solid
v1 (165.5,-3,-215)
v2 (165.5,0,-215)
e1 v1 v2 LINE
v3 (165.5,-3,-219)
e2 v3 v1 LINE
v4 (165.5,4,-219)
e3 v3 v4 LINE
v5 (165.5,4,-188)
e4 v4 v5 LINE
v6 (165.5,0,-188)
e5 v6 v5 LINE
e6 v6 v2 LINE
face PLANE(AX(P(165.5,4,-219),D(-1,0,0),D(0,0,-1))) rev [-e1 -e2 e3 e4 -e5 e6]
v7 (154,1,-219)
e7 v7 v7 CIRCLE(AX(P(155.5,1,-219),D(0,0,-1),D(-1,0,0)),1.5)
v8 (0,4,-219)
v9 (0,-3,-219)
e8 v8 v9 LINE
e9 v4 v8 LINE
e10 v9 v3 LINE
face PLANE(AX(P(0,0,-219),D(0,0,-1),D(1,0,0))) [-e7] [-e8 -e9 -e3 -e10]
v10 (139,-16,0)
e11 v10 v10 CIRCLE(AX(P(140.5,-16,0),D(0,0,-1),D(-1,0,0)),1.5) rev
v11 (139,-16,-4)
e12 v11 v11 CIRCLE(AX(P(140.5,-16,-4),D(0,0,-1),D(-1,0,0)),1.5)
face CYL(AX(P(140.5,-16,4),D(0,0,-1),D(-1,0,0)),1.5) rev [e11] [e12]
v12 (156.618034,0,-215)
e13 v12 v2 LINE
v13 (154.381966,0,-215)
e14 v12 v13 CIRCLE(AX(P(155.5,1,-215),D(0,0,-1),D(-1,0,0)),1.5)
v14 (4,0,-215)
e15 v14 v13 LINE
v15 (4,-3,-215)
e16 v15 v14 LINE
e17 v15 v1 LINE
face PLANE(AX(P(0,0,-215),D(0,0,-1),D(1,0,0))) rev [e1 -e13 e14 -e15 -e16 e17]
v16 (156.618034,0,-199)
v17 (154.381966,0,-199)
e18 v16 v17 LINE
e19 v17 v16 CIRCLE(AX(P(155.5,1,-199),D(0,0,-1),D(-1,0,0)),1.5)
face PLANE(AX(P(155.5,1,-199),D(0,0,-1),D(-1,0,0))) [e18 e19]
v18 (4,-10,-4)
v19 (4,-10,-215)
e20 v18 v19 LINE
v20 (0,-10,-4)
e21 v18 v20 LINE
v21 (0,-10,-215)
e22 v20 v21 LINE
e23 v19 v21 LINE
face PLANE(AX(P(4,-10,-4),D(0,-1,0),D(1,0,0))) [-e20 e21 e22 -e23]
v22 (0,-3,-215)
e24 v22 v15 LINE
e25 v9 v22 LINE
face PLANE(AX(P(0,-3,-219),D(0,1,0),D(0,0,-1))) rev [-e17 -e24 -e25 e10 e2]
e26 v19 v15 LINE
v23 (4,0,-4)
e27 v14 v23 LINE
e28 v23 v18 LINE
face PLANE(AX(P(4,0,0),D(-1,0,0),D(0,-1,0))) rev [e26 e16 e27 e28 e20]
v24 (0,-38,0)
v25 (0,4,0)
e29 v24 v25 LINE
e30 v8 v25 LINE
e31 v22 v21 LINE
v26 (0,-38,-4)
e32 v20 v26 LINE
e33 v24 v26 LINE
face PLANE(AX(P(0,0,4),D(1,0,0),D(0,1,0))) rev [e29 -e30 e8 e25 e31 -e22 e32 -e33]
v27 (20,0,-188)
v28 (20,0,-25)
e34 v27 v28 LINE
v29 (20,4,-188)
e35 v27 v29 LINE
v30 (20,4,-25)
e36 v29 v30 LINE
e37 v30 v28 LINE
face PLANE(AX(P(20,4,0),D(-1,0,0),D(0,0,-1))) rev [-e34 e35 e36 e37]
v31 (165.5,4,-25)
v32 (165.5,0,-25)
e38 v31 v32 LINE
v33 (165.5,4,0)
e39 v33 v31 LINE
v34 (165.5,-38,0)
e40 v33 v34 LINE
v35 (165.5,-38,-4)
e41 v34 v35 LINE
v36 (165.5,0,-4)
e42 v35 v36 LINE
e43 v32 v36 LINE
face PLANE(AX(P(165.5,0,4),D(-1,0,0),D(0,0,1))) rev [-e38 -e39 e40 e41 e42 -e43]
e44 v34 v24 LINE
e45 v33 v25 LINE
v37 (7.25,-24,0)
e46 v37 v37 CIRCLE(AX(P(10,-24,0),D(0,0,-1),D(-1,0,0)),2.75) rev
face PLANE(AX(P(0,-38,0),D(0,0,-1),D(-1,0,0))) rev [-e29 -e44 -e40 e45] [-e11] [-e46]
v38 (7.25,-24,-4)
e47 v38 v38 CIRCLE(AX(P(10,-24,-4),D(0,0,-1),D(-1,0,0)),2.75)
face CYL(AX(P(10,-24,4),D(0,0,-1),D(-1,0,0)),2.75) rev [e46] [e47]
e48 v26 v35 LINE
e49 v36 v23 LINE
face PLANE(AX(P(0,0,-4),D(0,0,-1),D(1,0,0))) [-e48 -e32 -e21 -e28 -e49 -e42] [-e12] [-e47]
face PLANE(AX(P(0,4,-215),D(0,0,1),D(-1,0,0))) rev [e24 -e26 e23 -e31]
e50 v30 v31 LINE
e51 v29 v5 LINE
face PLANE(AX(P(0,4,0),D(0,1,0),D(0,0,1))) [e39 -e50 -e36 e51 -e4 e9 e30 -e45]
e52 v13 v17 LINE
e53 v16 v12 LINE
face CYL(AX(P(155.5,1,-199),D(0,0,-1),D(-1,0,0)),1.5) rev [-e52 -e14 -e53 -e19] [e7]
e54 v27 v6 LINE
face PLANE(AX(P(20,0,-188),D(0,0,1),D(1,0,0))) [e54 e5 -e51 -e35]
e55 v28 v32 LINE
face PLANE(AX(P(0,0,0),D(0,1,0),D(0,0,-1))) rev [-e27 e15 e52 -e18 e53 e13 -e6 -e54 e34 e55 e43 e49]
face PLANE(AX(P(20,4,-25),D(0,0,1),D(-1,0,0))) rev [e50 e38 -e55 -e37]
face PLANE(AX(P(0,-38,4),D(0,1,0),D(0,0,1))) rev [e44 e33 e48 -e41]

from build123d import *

# Parameters (mm, degrees)
SKETCH_1_W           = 165.5
SKETCH_1_H           = 38
EXTRUDE_1_DEPTH      = 4
SKETCH_2_W           = 20
SKETCH_2_H           = 215
EXTRUDE_2_DEPTH      = 4
SKETCH_3_W           = 211
SKETCH_3_H           = 10
EXTRUDE_3_DEPTH      = 4
SKETCH_4_W           = 145.5
SKETCH_4_H           = 25
EXTRUDE_4_DEPTH      = 4
SKETCH_5_R           = 1.5
CUT_EXTRUDE_1_DEPTH  = 4
SKETCH_6_W           = 165.5
SKETCH_6_H           = 7
EXTRUDE_5_DEPTH      = 4
SKETCH_7_W           = 145.5
SKETCH_7_H           = 27
EXTRUDE_6_DEPTH      = 4
SKETCH_8_R           = 2.75
CUT_EXTRUDE_2_DEPTH  = 4
MIRROR_START         = -4
MIRROR_3_OUTLINE_W   = 165.5
MIRROR_3_OUTLINE_H   = 42
MIRROR_3_OUTLINE_R   = 1.5
MIRROR_3_OUTLINE_R_2 = 2.75
MIRROR_3_DEPTH       = 4
MIRROR_START_2       = -215
MIRROR_3_2_DEPTH     = 211
MIRROR_START_3       = -25
MIRROR_3_3_OUTLINE_W = 145.5
MIRROR_3_3_OUTLINE_H = 4
MIRROR_3_3_DEPTH     = 21
MIRROR_START_4       = -219
MIRROR_3_4_OUTLINE_W = 165.5
MIRROR_3_4_OUTLINE_H = 7
MIRROR_3_4_DEPTH     = 4
SKETCH_9_W           = 186.740400525
SKETCH_9_H           = 237.71944978
CUT_EXTRUDE_3_DEPTH  = 278.696326947
SKETCH_10_W          = 145.5
SKETCH_10_H          = 27
EXTRUDE_7_DEPTH      = 4
SKETCH_11_R          = 1.5
CUT_EXTRUDE_4_DEPTH  = 20


# Read off the part's stored shape, not the designer's step: 镜向3
with BuildPart() as part:
    # 草图1 → 凸台-拉伸1 (new body)
    with BuildSketch(Plane.XY):
        with Locations((82.75, -19)):
            Rectangle(SKETCH_1_W, SKETCH_1_H)
    extrude(amount=EXTRUDE_1_DEPTH)

    # 草图2 → 凸台-拉伸2 (add)
    with BuildSketch(Plane(origin=(0, 0, 0), x_dir=(1, 0, 0), z_dir=(0, 1, 0))):
        with Locations((10, -107.5)):
            Rectangle(SKETCH_2_W, SKETCH_2_H)
    extrude(amount=EXTRUDE_2_DEPTH)

    # 草图3 → 凸台-拉伸3 (add)
    with BuildSketch(Plane.ZY):
        with Locations((109.5, -5)):
            Rectangle(SKETCH_3_W, SKETCH_3_H)
    extrude(amount=-EXTRUDE_3_DEPTH)

    # 草图4 → 凸台-拉伸4 (add)
    with BuildSketch(Plane(origin=(0, 0, 0), x_dir=(1, 0, 0), z_dir=(0, 1, 0))):
        with Locations((92.75, -12.5)):
            Rectangle(SKETCH_4_W, SKETCH_4_H)
    extrude(amount=EXTRUDE_4_DEPTH)

    # 草图5 → 切除-拉伸1 (cut)
    with BuildSketch(Plane(origin=(0, 0, 0), x_dir=(-1, 0, 0), z_dir=(0, 0, -1))):
        with Locations((-140.5, -16)):
            Circle(SKETCH_5_R)
    extrude(amount=-CUT_EXTRUDE_1_DEPTH, mode=Mode.SUBTRACT)

    # 草图6 → 凸台-拉伸5 (add)
    with BuildSketch(Plane.XY.offset(215)):
        with Locations((82.75, 0.5)):
            Rectangle(SKETCH_6_W, SKETCH_6_H)
    extrude(amount=EXTRUDE_5_DEPTH)

    # 草图8 → 切除-拉伸2 (cut)
    with BuildSketch(Plane(origin=(0, 0, 0), x_dir=(-1, 0, 0), z_dir=(0, 0, -1))):
        with Locations((-10, -24)):
            Circle(SKETCH_8_R)
    extrude(amount=-CUT_EXTRUDE_2_DEPTH, mode=Mode.SUBTRACT)

    # 镜向3 outline → 镜向3 (add)
    with BuildSketch(Plane.XY.offset(MIRROR_START)):
        with Locations((82.75, -17)):
            Rectangle(MIRROR_3_OUTLINE_W, MIRROR_3_OUTLINE_H)
        with Locations((140.5, -16)):
            Circle(MIRROR_3_OUTLINE_R, mode=Mode.SUBTRACT)
        with Locations((10, -24)):
            Circle(MIRROR_3_OUTLINE_R_2, mode=Mode.SUBTRACT)
    extrude(amount=MIRROR_3_DEPTH)

    # Mirror 3 2 outline → Mirror 3 2 (add)
    with BuildSketch(Plane.XY.offset(MIRROR_START_2)):
        Polygon((20, 0), (20, 4), (0, 4), (0, -10), (4, -10), (4, 0), align=None)
    extrude(amount=MIRROR_3_2_DEPTH)

    # Mirror 3 3 outline → Mirror 3 3 (add)
    with BuildSketch(Plane.XY.offset(MIRROR_START_3)):
        with Locations((92.75, 2)):
            Rectangle(MIRROR_3_3_OUTLINE_W, MIRROR_3_3_OUTLINE_H)
    extrude(amount=MIRROR_3_3_DEPTH)

    # Mirror 3 4 outline → Mirror 3 4 (add)
    with BuildSketch(Plane.XY.offset(MIRROR_START_4)):
        with Locations((82.75, 0.5)):
            Rectangle(MIRROR_3_4_OUTLINE_W, MIRROR_3_4_OUTLINE_H)
    extrude(amount=MIRROR_3_4_DEPTH)


with BuildPart() as body_2:
    # 草图7 → 凸台-拉伸6 (new body)
    with BuildSketch(Plane(origin=(0, 4, 0), x_dir=(1, 0, 0), z_dir=(0, 1, 0))):
        with Locations((92.75, -201.5)):
            Rectangle(SKETCH_7_W, SKETCH_7_H)
    extrude(amount=-EXTRUDE_6_DEPTH)


with BuildPart() as cut_extrude_3_tool:
    # 草图9 → 切除-拉伸3 (new, through all)
    with BuildSketch(Plane(origin=(0, 4, 0), x_dir=(1, 0, 0), z_dir=(0, 1, 0))):
        with Locations((93.370200263, -118.85972489)):
            Rectangle(SKETCH_9_W, SKETCH_9_H)
    extrude(amount=-CUT_EXTRUDE_3_DEPTH)


with BuildPart() as part_1:
    add(part.part)

    # 切除-拉伸3: cut by cut_extrude_3_tool
    add(cut_extrude_3_tool.part, mode=Mode.SUBTRACT)

    # 草图10 → 凸台-拉伸7 (add)
    with BuildSketch(Plane(origin=(0, 4, 0), x_dir=(1, 0, 0), z_dir=(0, 1, 0))):
        with Locations((92.75, 201.5)):
            Rectangle(SKETCH_10_W, SKETCH_10_H)
    extrude(amount=-EXTRUDE_7_DEPTH)

    # 草图11 → 切除-拉伸4 (cut)
    with BuildSketch(Plane(origin=(0, 0, -219), x_dir=(-1, 0, 0), z_dir=(0, 0, -1))):
        with Locations((-155.5, 1)):
            Circle(SKETCH_11_R)
    extrude(amount=-CUT_EXTRUDE_4_DEPTH, mode=Mode.SUBTRACT)


with BuildPart() as body_2_1:
    add(body_2.part)

    # 切除-拉伸3: cut by cut_extrude_3_tool
    add(cut_extrude_3_tool.part, mode=Mode.SUBTRACT)


solid = part_1.part
